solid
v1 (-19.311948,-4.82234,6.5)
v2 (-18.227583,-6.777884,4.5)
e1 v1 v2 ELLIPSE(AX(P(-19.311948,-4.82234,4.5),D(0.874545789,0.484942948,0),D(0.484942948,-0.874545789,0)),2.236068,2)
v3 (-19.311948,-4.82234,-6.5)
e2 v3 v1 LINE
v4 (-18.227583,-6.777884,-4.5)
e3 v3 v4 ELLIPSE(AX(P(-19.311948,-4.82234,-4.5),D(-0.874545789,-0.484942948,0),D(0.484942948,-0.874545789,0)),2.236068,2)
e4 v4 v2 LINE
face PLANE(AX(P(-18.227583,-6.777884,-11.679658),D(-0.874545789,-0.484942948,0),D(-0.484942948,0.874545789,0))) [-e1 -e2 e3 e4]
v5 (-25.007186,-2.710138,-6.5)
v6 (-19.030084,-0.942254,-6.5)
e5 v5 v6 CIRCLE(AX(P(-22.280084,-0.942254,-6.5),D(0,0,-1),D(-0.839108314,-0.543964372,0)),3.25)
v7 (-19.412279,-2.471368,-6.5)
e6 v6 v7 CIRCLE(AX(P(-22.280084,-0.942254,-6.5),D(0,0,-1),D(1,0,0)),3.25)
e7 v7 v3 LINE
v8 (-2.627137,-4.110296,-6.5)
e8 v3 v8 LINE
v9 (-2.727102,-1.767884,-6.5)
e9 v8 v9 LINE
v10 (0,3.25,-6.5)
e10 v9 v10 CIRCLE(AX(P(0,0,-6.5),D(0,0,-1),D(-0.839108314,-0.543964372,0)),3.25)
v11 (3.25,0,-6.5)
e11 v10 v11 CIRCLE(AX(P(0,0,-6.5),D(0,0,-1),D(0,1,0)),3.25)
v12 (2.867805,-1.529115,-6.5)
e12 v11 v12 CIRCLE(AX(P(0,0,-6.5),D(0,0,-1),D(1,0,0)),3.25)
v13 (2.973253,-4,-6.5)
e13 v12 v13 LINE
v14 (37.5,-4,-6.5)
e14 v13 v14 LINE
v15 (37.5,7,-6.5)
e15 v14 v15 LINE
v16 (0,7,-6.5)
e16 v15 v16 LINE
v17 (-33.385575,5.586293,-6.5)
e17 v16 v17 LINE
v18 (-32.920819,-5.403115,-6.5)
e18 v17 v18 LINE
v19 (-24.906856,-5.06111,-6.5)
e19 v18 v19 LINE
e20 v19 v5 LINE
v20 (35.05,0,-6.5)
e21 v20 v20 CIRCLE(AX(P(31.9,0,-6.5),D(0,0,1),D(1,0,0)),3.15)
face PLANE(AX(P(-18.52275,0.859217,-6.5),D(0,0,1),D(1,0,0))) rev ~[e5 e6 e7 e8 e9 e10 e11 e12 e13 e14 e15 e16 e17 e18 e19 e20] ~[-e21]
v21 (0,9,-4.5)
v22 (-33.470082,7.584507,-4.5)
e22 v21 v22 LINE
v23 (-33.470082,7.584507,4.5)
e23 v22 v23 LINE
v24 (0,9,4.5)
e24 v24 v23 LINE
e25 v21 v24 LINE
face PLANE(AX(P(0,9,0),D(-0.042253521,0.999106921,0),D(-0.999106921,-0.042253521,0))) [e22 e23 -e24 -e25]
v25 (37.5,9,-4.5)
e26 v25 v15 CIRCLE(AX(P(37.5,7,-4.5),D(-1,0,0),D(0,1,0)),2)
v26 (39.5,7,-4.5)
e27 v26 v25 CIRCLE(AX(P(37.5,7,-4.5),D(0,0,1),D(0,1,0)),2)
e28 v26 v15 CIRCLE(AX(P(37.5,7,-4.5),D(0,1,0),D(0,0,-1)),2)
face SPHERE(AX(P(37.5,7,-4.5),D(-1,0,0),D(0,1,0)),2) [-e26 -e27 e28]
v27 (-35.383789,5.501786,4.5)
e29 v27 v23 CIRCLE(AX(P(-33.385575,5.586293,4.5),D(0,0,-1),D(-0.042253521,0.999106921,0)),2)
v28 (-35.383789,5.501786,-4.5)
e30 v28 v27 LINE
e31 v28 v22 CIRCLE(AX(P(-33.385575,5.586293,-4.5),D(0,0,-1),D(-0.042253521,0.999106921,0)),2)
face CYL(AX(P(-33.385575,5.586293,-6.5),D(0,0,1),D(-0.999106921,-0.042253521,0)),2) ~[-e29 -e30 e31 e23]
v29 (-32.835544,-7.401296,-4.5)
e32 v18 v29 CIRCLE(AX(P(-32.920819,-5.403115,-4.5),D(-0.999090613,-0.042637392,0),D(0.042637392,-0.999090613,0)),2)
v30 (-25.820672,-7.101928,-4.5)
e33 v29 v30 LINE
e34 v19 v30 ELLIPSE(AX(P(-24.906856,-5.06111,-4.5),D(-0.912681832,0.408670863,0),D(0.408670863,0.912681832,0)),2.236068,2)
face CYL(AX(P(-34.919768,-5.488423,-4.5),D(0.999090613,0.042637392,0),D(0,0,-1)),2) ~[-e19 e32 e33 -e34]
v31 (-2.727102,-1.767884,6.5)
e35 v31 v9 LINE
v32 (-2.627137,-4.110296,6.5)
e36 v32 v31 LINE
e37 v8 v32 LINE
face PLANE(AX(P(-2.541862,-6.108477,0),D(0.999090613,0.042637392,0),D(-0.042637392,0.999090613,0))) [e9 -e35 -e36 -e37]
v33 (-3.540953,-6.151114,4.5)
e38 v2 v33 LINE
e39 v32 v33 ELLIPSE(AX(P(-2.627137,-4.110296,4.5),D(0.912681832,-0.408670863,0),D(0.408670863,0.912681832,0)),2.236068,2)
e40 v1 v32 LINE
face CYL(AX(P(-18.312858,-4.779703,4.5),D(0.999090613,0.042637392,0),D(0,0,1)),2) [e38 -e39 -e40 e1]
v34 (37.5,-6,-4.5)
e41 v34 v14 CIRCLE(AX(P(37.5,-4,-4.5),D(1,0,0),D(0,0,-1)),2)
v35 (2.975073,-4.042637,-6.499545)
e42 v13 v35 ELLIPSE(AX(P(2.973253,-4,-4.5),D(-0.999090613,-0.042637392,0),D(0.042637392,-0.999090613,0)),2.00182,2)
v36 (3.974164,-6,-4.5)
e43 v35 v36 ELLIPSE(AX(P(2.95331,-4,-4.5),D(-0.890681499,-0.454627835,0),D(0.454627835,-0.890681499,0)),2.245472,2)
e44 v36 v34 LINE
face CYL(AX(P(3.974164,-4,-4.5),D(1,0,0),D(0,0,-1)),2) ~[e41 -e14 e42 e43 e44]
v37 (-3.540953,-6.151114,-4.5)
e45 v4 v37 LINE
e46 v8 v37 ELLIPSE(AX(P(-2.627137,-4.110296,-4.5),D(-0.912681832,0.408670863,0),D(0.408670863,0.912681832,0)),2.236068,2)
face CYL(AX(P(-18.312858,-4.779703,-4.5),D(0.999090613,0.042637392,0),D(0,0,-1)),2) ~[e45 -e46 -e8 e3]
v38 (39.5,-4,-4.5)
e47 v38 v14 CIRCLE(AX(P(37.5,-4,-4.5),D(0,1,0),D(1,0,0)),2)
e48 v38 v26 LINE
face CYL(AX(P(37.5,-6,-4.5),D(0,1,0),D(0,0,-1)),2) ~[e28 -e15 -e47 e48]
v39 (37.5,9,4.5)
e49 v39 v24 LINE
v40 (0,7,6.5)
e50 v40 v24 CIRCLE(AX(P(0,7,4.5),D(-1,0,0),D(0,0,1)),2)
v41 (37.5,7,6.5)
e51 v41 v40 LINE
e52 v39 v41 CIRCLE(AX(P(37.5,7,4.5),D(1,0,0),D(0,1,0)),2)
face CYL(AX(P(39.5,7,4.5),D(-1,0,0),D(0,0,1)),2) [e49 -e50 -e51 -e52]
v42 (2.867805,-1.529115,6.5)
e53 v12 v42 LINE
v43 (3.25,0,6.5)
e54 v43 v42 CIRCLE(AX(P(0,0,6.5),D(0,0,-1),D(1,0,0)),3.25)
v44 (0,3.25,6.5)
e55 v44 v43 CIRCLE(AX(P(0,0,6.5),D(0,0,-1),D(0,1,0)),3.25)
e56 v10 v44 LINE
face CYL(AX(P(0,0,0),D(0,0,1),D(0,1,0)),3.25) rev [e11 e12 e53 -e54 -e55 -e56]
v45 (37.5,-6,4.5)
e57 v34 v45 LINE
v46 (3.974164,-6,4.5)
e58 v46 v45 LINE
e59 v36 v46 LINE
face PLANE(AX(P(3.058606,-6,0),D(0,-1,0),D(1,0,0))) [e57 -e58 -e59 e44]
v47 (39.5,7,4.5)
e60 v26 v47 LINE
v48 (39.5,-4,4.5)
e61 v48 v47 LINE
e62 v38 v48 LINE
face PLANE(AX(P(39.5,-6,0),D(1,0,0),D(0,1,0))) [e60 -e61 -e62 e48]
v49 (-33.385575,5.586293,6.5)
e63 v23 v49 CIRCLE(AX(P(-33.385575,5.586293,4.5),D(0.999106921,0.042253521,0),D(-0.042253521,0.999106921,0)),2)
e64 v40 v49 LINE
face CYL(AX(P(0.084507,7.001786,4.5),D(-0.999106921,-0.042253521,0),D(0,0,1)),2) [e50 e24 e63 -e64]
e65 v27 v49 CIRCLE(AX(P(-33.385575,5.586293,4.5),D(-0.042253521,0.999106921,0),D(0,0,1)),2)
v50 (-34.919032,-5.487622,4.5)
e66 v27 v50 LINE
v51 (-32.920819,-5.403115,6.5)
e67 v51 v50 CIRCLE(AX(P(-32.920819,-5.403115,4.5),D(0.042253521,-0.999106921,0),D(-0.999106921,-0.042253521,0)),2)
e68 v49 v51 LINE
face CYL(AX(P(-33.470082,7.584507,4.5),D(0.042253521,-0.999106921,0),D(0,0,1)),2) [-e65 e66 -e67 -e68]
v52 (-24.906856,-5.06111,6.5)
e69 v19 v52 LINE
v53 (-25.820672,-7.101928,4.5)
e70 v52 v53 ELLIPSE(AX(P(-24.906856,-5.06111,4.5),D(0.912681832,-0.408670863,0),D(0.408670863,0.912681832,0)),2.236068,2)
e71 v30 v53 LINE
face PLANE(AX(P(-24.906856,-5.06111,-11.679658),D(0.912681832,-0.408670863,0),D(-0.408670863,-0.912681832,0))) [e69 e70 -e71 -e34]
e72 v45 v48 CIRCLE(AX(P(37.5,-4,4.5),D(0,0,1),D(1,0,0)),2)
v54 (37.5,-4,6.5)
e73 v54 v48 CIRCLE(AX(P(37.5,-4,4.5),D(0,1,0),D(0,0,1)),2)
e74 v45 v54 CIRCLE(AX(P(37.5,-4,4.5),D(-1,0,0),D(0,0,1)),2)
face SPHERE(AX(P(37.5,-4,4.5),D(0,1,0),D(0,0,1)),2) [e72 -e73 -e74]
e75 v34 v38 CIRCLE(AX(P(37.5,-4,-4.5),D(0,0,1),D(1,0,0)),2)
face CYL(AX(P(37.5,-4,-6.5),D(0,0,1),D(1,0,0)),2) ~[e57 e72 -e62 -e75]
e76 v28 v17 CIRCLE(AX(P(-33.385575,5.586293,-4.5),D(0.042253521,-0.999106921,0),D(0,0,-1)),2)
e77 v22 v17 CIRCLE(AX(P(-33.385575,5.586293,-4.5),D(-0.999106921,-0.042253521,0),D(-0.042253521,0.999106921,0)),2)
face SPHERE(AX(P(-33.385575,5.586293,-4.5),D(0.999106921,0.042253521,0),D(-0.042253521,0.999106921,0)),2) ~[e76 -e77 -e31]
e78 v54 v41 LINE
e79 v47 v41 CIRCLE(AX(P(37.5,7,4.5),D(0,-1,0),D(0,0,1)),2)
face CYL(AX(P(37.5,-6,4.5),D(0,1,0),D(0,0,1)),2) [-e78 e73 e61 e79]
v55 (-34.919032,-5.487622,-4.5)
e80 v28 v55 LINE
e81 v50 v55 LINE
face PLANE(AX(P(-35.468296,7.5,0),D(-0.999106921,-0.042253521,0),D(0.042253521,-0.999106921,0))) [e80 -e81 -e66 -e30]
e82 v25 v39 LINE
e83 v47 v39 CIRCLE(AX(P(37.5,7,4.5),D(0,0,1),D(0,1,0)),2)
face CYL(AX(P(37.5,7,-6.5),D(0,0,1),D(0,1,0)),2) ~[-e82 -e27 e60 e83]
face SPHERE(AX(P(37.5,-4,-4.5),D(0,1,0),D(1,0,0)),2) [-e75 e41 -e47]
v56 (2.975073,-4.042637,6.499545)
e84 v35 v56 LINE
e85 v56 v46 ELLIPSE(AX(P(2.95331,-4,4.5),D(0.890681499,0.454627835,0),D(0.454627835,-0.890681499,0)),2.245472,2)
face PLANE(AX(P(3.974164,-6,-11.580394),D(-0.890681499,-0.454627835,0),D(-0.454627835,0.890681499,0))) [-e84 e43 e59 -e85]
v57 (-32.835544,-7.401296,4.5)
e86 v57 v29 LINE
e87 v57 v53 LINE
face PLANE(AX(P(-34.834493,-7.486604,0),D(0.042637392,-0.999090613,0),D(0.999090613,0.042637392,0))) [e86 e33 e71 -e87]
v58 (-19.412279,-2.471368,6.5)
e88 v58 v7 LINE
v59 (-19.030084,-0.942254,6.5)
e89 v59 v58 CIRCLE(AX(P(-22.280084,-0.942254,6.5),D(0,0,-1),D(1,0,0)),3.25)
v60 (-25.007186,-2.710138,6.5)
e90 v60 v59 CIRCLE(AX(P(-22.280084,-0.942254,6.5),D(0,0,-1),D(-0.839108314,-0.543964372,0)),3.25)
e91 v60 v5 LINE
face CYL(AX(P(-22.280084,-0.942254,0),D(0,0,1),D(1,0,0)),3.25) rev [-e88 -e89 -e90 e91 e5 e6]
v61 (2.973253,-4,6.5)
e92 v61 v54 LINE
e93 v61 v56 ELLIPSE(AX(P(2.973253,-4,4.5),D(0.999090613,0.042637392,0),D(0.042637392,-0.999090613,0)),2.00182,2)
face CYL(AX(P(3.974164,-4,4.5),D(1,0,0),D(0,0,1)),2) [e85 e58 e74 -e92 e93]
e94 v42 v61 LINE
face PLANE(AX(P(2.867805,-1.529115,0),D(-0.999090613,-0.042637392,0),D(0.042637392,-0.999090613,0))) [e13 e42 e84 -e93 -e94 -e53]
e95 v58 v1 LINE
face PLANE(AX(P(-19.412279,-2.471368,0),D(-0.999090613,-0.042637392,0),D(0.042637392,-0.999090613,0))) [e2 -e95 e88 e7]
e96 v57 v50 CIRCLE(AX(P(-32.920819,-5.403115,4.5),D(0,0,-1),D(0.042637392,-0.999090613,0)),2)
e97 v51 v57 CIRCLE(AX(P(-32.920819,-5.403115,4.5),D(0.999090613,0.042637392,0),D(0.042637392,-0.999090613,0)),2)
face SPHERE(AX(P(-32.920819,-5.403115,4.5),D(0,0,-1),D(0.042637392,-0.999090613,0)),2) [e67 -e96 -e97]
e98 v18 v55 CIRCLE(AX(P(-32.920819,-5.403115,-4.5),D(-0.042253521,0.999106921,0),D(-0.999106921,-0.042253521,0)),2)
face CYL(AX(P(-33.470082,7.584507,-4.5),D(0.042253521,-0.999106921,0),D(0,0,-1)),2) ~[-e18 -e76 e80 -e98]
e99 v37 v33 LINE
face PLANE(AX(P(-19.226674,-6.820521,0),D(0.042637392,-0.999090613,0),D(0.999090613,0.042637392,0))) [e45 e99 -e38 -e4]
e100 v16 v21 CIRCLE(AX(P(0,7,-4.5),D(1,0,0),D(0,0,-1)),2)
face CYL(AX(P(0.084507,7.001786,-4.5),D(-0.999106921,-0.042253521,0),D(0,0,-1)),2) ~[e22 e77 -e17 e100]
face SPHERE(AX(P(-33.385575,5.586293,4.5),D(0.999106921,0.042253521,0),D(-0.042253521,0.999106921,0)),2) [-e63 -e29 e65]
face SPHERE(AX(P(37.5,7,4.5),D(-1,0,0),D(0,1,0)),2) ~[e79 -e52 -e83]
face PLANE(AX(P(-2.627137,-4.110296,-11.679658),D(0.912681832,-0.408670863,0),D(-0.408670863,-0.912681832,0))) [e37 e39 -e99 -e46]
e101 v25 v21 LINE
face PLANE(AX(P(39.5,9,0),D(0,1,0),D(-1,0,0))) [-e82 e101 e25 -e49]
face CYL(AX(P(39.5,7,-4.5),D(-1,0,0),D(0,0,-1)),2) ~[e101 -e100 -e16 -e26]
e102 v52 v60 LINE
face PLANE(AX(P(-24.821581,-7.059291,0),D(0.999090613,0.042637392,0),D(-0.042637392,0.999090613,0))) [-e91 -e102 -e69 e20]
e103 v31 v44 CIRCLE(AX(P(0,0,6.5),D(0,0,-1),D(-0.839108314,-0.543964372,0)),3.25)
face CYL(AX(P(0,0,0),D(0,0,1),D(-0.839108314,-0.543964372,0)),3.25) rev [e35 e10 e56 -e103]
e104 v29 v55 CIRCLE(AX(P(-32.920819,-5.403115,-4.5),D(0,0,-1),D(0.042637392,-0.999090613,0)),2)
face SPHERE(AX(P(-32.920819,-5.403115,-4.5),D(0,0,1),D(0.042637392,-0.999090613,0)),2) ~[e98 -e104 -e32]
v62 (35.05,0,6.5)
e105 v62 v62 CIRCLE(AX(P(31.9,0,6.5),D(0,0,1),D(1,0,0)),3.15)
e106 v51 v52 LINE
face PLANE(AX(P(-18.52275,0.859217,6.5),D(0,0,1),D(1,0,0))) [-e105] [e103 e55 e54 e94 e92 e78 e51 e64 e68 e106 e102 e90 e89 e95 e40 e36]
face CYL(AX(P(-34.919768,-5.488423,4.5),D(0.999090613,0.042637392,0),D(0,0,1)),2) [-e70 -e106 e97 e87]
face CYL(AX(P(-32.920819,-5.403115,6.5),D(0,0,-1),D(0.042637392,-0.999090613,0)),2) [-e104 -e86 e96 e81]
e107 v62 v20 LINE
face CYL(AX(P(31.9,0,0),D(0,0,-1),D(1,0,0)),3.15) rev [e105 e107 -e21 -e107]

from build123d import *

# Parameters (mm, degrees)
F0_R        = 3.15
F1_DEPTH    = 6.5
F2_T1_DEPTH = 23.3593154951
F2_T3_DEPTH = 23.1607876028
F4_R        = 2


# Not quite as in the source:
# - a fillet or chamfer that OpenCascade refuses, or shapes differently, is made with other operations: its cross-section is extruded or revolved along the edge and cut away or added
# - two fillets or chamfers of one size are made in one step


with BuildPart() as f1:
    # F0 (on Top) → F1 (new body, symmetric)
    with BuildSketch(Plane.XY):
        with BuildLine():
            ThreePointArc((-2.7271020198, -1.7678842082), (-2.8555317961, 1.5519143538), (0, 3.25))
            Line((0, 3.25), (0, 9))
            Line((0, 9), (-35.4682957019, 7.5))
            Line((-35.4682957019, 7.5), (-34.834492885, -7.4866038177))
            Line((-34.834492885, -7.4866038177), (-24.8215810327, -7.0592907796))
            Line((-24.8215810327, -7.0592907796), (-25.0071863621, -2.7101377293))
            ThreePointArc((-25.0071863621, -2.7101377293), (-23.2018810758, 2.1742815392), (-19.0300843423, -0.9422535211))
            ThreePointArc((-19.0300843423, -0.9422535211), (-19.1270804103, -1.7303310583), (-19.4122789298, -2.4713683356))
            Line((-19.4122789298, -2.4713683356), (-19.2266736003, -6.8205213858))
            Line((-19.2266736003, -6.8205213858), (-2.5418620091, -6.1084770138))
            Line((-2.5418620091, -6.1084770138), (-2.7271020198, -1.7678842082))
        make_face()
        with BuildLine():
            ThreePointArc((3.25, 0), (3.153003932, -0.7880775372), (2.8678054126, -1.5291148144))
            Line((2.8678054126, -1.5291148144), (3.0586058071, -6))
            Line((3.0586058071, -6), (39.5, -6))
            Line((39.5, -6), (39.5, 9))
            Line((39.5, 9), (0, 9))
            Line((0, 9), (0, 3.25))
            ThreePointArc((0, 3.25), (2.2980970389, 2.2980970389), (3.25, 0))
        make_face()
        with Locations((31.9, 0)):
            Circle(F0_R, mode=Mode.SUBTRACT)
    extrude(amount=F1_DEPTH, both=True)

    # F2: chamfer of 2 x 1 on 4 edges, made by hand

    # F2_s2 → F2_t1 (cut)
    with BuildSketch(Plane.XY.offset(-11.6796577476)):
        Polygon((-24.9068558162, -5.0611095538), (-25.8206716456, -7.1019281713), (-24.8215810327, -7.0592907796), align=None)
        Polygon((-2.6271367926, -4.110295788), (-3.540952622, -6.1511144056), (-2.5418620091, -6.1084770138), align=None)
        Polygon((-18.2275829874, -6.7778839941), (-19.3119483838, -4.82234016), (-19.2266736003, -6.8205213858), align=None)
    extrude(amount=F2_T1_DEPTH, mode=Mode.SUBTRACT)

    # F2_s4 → F2_t3 (cut)
    with BuildSketch(Plane.XY.offset(-11.5803938014)):
        Polygon((3.97416362, -6), (2.9750730071, -4.0426373917), (3.0586058071, -6), align=None)
    extrude(amount=F2_T3_DEPTH, mode=Mode.SUBTRACT)

    # F4
    f4_edges = [f1.edges().sort_by_distance(p)[0] for p in [
        (-17.734148, 8.25, 6.5),
        (19.75, 9, 6.5),
        (-17.734148, 8.25, -6.5),
        (19.75, 9, -6.5),
        (-35.468296, 7.5, 0),
        (39.5, 9, 0),
        (39.5, 1.5, 6.5),
        (39.5, 1.5, -6.5),
        (-35.151394, 0.006698, -6.5),
        (-35.151394, 0.006698, 6.5),
        (-34.834493, -7.486604, 0),
        (-30.327582, -7.294266, -6.5),
        (-30.327582, -7.294266, 6.5),
        (-10.884268, -6.464499, 6.5),
        (-10.884268, -6.464499, -6.5),
        (21.737082, -6, 6.5),
        (39.5, -6, 0),
        (21.737082, -6, -6.5),
    ]]
    fillet(f4_edges, radius=F4_R)


solid = f1.part
